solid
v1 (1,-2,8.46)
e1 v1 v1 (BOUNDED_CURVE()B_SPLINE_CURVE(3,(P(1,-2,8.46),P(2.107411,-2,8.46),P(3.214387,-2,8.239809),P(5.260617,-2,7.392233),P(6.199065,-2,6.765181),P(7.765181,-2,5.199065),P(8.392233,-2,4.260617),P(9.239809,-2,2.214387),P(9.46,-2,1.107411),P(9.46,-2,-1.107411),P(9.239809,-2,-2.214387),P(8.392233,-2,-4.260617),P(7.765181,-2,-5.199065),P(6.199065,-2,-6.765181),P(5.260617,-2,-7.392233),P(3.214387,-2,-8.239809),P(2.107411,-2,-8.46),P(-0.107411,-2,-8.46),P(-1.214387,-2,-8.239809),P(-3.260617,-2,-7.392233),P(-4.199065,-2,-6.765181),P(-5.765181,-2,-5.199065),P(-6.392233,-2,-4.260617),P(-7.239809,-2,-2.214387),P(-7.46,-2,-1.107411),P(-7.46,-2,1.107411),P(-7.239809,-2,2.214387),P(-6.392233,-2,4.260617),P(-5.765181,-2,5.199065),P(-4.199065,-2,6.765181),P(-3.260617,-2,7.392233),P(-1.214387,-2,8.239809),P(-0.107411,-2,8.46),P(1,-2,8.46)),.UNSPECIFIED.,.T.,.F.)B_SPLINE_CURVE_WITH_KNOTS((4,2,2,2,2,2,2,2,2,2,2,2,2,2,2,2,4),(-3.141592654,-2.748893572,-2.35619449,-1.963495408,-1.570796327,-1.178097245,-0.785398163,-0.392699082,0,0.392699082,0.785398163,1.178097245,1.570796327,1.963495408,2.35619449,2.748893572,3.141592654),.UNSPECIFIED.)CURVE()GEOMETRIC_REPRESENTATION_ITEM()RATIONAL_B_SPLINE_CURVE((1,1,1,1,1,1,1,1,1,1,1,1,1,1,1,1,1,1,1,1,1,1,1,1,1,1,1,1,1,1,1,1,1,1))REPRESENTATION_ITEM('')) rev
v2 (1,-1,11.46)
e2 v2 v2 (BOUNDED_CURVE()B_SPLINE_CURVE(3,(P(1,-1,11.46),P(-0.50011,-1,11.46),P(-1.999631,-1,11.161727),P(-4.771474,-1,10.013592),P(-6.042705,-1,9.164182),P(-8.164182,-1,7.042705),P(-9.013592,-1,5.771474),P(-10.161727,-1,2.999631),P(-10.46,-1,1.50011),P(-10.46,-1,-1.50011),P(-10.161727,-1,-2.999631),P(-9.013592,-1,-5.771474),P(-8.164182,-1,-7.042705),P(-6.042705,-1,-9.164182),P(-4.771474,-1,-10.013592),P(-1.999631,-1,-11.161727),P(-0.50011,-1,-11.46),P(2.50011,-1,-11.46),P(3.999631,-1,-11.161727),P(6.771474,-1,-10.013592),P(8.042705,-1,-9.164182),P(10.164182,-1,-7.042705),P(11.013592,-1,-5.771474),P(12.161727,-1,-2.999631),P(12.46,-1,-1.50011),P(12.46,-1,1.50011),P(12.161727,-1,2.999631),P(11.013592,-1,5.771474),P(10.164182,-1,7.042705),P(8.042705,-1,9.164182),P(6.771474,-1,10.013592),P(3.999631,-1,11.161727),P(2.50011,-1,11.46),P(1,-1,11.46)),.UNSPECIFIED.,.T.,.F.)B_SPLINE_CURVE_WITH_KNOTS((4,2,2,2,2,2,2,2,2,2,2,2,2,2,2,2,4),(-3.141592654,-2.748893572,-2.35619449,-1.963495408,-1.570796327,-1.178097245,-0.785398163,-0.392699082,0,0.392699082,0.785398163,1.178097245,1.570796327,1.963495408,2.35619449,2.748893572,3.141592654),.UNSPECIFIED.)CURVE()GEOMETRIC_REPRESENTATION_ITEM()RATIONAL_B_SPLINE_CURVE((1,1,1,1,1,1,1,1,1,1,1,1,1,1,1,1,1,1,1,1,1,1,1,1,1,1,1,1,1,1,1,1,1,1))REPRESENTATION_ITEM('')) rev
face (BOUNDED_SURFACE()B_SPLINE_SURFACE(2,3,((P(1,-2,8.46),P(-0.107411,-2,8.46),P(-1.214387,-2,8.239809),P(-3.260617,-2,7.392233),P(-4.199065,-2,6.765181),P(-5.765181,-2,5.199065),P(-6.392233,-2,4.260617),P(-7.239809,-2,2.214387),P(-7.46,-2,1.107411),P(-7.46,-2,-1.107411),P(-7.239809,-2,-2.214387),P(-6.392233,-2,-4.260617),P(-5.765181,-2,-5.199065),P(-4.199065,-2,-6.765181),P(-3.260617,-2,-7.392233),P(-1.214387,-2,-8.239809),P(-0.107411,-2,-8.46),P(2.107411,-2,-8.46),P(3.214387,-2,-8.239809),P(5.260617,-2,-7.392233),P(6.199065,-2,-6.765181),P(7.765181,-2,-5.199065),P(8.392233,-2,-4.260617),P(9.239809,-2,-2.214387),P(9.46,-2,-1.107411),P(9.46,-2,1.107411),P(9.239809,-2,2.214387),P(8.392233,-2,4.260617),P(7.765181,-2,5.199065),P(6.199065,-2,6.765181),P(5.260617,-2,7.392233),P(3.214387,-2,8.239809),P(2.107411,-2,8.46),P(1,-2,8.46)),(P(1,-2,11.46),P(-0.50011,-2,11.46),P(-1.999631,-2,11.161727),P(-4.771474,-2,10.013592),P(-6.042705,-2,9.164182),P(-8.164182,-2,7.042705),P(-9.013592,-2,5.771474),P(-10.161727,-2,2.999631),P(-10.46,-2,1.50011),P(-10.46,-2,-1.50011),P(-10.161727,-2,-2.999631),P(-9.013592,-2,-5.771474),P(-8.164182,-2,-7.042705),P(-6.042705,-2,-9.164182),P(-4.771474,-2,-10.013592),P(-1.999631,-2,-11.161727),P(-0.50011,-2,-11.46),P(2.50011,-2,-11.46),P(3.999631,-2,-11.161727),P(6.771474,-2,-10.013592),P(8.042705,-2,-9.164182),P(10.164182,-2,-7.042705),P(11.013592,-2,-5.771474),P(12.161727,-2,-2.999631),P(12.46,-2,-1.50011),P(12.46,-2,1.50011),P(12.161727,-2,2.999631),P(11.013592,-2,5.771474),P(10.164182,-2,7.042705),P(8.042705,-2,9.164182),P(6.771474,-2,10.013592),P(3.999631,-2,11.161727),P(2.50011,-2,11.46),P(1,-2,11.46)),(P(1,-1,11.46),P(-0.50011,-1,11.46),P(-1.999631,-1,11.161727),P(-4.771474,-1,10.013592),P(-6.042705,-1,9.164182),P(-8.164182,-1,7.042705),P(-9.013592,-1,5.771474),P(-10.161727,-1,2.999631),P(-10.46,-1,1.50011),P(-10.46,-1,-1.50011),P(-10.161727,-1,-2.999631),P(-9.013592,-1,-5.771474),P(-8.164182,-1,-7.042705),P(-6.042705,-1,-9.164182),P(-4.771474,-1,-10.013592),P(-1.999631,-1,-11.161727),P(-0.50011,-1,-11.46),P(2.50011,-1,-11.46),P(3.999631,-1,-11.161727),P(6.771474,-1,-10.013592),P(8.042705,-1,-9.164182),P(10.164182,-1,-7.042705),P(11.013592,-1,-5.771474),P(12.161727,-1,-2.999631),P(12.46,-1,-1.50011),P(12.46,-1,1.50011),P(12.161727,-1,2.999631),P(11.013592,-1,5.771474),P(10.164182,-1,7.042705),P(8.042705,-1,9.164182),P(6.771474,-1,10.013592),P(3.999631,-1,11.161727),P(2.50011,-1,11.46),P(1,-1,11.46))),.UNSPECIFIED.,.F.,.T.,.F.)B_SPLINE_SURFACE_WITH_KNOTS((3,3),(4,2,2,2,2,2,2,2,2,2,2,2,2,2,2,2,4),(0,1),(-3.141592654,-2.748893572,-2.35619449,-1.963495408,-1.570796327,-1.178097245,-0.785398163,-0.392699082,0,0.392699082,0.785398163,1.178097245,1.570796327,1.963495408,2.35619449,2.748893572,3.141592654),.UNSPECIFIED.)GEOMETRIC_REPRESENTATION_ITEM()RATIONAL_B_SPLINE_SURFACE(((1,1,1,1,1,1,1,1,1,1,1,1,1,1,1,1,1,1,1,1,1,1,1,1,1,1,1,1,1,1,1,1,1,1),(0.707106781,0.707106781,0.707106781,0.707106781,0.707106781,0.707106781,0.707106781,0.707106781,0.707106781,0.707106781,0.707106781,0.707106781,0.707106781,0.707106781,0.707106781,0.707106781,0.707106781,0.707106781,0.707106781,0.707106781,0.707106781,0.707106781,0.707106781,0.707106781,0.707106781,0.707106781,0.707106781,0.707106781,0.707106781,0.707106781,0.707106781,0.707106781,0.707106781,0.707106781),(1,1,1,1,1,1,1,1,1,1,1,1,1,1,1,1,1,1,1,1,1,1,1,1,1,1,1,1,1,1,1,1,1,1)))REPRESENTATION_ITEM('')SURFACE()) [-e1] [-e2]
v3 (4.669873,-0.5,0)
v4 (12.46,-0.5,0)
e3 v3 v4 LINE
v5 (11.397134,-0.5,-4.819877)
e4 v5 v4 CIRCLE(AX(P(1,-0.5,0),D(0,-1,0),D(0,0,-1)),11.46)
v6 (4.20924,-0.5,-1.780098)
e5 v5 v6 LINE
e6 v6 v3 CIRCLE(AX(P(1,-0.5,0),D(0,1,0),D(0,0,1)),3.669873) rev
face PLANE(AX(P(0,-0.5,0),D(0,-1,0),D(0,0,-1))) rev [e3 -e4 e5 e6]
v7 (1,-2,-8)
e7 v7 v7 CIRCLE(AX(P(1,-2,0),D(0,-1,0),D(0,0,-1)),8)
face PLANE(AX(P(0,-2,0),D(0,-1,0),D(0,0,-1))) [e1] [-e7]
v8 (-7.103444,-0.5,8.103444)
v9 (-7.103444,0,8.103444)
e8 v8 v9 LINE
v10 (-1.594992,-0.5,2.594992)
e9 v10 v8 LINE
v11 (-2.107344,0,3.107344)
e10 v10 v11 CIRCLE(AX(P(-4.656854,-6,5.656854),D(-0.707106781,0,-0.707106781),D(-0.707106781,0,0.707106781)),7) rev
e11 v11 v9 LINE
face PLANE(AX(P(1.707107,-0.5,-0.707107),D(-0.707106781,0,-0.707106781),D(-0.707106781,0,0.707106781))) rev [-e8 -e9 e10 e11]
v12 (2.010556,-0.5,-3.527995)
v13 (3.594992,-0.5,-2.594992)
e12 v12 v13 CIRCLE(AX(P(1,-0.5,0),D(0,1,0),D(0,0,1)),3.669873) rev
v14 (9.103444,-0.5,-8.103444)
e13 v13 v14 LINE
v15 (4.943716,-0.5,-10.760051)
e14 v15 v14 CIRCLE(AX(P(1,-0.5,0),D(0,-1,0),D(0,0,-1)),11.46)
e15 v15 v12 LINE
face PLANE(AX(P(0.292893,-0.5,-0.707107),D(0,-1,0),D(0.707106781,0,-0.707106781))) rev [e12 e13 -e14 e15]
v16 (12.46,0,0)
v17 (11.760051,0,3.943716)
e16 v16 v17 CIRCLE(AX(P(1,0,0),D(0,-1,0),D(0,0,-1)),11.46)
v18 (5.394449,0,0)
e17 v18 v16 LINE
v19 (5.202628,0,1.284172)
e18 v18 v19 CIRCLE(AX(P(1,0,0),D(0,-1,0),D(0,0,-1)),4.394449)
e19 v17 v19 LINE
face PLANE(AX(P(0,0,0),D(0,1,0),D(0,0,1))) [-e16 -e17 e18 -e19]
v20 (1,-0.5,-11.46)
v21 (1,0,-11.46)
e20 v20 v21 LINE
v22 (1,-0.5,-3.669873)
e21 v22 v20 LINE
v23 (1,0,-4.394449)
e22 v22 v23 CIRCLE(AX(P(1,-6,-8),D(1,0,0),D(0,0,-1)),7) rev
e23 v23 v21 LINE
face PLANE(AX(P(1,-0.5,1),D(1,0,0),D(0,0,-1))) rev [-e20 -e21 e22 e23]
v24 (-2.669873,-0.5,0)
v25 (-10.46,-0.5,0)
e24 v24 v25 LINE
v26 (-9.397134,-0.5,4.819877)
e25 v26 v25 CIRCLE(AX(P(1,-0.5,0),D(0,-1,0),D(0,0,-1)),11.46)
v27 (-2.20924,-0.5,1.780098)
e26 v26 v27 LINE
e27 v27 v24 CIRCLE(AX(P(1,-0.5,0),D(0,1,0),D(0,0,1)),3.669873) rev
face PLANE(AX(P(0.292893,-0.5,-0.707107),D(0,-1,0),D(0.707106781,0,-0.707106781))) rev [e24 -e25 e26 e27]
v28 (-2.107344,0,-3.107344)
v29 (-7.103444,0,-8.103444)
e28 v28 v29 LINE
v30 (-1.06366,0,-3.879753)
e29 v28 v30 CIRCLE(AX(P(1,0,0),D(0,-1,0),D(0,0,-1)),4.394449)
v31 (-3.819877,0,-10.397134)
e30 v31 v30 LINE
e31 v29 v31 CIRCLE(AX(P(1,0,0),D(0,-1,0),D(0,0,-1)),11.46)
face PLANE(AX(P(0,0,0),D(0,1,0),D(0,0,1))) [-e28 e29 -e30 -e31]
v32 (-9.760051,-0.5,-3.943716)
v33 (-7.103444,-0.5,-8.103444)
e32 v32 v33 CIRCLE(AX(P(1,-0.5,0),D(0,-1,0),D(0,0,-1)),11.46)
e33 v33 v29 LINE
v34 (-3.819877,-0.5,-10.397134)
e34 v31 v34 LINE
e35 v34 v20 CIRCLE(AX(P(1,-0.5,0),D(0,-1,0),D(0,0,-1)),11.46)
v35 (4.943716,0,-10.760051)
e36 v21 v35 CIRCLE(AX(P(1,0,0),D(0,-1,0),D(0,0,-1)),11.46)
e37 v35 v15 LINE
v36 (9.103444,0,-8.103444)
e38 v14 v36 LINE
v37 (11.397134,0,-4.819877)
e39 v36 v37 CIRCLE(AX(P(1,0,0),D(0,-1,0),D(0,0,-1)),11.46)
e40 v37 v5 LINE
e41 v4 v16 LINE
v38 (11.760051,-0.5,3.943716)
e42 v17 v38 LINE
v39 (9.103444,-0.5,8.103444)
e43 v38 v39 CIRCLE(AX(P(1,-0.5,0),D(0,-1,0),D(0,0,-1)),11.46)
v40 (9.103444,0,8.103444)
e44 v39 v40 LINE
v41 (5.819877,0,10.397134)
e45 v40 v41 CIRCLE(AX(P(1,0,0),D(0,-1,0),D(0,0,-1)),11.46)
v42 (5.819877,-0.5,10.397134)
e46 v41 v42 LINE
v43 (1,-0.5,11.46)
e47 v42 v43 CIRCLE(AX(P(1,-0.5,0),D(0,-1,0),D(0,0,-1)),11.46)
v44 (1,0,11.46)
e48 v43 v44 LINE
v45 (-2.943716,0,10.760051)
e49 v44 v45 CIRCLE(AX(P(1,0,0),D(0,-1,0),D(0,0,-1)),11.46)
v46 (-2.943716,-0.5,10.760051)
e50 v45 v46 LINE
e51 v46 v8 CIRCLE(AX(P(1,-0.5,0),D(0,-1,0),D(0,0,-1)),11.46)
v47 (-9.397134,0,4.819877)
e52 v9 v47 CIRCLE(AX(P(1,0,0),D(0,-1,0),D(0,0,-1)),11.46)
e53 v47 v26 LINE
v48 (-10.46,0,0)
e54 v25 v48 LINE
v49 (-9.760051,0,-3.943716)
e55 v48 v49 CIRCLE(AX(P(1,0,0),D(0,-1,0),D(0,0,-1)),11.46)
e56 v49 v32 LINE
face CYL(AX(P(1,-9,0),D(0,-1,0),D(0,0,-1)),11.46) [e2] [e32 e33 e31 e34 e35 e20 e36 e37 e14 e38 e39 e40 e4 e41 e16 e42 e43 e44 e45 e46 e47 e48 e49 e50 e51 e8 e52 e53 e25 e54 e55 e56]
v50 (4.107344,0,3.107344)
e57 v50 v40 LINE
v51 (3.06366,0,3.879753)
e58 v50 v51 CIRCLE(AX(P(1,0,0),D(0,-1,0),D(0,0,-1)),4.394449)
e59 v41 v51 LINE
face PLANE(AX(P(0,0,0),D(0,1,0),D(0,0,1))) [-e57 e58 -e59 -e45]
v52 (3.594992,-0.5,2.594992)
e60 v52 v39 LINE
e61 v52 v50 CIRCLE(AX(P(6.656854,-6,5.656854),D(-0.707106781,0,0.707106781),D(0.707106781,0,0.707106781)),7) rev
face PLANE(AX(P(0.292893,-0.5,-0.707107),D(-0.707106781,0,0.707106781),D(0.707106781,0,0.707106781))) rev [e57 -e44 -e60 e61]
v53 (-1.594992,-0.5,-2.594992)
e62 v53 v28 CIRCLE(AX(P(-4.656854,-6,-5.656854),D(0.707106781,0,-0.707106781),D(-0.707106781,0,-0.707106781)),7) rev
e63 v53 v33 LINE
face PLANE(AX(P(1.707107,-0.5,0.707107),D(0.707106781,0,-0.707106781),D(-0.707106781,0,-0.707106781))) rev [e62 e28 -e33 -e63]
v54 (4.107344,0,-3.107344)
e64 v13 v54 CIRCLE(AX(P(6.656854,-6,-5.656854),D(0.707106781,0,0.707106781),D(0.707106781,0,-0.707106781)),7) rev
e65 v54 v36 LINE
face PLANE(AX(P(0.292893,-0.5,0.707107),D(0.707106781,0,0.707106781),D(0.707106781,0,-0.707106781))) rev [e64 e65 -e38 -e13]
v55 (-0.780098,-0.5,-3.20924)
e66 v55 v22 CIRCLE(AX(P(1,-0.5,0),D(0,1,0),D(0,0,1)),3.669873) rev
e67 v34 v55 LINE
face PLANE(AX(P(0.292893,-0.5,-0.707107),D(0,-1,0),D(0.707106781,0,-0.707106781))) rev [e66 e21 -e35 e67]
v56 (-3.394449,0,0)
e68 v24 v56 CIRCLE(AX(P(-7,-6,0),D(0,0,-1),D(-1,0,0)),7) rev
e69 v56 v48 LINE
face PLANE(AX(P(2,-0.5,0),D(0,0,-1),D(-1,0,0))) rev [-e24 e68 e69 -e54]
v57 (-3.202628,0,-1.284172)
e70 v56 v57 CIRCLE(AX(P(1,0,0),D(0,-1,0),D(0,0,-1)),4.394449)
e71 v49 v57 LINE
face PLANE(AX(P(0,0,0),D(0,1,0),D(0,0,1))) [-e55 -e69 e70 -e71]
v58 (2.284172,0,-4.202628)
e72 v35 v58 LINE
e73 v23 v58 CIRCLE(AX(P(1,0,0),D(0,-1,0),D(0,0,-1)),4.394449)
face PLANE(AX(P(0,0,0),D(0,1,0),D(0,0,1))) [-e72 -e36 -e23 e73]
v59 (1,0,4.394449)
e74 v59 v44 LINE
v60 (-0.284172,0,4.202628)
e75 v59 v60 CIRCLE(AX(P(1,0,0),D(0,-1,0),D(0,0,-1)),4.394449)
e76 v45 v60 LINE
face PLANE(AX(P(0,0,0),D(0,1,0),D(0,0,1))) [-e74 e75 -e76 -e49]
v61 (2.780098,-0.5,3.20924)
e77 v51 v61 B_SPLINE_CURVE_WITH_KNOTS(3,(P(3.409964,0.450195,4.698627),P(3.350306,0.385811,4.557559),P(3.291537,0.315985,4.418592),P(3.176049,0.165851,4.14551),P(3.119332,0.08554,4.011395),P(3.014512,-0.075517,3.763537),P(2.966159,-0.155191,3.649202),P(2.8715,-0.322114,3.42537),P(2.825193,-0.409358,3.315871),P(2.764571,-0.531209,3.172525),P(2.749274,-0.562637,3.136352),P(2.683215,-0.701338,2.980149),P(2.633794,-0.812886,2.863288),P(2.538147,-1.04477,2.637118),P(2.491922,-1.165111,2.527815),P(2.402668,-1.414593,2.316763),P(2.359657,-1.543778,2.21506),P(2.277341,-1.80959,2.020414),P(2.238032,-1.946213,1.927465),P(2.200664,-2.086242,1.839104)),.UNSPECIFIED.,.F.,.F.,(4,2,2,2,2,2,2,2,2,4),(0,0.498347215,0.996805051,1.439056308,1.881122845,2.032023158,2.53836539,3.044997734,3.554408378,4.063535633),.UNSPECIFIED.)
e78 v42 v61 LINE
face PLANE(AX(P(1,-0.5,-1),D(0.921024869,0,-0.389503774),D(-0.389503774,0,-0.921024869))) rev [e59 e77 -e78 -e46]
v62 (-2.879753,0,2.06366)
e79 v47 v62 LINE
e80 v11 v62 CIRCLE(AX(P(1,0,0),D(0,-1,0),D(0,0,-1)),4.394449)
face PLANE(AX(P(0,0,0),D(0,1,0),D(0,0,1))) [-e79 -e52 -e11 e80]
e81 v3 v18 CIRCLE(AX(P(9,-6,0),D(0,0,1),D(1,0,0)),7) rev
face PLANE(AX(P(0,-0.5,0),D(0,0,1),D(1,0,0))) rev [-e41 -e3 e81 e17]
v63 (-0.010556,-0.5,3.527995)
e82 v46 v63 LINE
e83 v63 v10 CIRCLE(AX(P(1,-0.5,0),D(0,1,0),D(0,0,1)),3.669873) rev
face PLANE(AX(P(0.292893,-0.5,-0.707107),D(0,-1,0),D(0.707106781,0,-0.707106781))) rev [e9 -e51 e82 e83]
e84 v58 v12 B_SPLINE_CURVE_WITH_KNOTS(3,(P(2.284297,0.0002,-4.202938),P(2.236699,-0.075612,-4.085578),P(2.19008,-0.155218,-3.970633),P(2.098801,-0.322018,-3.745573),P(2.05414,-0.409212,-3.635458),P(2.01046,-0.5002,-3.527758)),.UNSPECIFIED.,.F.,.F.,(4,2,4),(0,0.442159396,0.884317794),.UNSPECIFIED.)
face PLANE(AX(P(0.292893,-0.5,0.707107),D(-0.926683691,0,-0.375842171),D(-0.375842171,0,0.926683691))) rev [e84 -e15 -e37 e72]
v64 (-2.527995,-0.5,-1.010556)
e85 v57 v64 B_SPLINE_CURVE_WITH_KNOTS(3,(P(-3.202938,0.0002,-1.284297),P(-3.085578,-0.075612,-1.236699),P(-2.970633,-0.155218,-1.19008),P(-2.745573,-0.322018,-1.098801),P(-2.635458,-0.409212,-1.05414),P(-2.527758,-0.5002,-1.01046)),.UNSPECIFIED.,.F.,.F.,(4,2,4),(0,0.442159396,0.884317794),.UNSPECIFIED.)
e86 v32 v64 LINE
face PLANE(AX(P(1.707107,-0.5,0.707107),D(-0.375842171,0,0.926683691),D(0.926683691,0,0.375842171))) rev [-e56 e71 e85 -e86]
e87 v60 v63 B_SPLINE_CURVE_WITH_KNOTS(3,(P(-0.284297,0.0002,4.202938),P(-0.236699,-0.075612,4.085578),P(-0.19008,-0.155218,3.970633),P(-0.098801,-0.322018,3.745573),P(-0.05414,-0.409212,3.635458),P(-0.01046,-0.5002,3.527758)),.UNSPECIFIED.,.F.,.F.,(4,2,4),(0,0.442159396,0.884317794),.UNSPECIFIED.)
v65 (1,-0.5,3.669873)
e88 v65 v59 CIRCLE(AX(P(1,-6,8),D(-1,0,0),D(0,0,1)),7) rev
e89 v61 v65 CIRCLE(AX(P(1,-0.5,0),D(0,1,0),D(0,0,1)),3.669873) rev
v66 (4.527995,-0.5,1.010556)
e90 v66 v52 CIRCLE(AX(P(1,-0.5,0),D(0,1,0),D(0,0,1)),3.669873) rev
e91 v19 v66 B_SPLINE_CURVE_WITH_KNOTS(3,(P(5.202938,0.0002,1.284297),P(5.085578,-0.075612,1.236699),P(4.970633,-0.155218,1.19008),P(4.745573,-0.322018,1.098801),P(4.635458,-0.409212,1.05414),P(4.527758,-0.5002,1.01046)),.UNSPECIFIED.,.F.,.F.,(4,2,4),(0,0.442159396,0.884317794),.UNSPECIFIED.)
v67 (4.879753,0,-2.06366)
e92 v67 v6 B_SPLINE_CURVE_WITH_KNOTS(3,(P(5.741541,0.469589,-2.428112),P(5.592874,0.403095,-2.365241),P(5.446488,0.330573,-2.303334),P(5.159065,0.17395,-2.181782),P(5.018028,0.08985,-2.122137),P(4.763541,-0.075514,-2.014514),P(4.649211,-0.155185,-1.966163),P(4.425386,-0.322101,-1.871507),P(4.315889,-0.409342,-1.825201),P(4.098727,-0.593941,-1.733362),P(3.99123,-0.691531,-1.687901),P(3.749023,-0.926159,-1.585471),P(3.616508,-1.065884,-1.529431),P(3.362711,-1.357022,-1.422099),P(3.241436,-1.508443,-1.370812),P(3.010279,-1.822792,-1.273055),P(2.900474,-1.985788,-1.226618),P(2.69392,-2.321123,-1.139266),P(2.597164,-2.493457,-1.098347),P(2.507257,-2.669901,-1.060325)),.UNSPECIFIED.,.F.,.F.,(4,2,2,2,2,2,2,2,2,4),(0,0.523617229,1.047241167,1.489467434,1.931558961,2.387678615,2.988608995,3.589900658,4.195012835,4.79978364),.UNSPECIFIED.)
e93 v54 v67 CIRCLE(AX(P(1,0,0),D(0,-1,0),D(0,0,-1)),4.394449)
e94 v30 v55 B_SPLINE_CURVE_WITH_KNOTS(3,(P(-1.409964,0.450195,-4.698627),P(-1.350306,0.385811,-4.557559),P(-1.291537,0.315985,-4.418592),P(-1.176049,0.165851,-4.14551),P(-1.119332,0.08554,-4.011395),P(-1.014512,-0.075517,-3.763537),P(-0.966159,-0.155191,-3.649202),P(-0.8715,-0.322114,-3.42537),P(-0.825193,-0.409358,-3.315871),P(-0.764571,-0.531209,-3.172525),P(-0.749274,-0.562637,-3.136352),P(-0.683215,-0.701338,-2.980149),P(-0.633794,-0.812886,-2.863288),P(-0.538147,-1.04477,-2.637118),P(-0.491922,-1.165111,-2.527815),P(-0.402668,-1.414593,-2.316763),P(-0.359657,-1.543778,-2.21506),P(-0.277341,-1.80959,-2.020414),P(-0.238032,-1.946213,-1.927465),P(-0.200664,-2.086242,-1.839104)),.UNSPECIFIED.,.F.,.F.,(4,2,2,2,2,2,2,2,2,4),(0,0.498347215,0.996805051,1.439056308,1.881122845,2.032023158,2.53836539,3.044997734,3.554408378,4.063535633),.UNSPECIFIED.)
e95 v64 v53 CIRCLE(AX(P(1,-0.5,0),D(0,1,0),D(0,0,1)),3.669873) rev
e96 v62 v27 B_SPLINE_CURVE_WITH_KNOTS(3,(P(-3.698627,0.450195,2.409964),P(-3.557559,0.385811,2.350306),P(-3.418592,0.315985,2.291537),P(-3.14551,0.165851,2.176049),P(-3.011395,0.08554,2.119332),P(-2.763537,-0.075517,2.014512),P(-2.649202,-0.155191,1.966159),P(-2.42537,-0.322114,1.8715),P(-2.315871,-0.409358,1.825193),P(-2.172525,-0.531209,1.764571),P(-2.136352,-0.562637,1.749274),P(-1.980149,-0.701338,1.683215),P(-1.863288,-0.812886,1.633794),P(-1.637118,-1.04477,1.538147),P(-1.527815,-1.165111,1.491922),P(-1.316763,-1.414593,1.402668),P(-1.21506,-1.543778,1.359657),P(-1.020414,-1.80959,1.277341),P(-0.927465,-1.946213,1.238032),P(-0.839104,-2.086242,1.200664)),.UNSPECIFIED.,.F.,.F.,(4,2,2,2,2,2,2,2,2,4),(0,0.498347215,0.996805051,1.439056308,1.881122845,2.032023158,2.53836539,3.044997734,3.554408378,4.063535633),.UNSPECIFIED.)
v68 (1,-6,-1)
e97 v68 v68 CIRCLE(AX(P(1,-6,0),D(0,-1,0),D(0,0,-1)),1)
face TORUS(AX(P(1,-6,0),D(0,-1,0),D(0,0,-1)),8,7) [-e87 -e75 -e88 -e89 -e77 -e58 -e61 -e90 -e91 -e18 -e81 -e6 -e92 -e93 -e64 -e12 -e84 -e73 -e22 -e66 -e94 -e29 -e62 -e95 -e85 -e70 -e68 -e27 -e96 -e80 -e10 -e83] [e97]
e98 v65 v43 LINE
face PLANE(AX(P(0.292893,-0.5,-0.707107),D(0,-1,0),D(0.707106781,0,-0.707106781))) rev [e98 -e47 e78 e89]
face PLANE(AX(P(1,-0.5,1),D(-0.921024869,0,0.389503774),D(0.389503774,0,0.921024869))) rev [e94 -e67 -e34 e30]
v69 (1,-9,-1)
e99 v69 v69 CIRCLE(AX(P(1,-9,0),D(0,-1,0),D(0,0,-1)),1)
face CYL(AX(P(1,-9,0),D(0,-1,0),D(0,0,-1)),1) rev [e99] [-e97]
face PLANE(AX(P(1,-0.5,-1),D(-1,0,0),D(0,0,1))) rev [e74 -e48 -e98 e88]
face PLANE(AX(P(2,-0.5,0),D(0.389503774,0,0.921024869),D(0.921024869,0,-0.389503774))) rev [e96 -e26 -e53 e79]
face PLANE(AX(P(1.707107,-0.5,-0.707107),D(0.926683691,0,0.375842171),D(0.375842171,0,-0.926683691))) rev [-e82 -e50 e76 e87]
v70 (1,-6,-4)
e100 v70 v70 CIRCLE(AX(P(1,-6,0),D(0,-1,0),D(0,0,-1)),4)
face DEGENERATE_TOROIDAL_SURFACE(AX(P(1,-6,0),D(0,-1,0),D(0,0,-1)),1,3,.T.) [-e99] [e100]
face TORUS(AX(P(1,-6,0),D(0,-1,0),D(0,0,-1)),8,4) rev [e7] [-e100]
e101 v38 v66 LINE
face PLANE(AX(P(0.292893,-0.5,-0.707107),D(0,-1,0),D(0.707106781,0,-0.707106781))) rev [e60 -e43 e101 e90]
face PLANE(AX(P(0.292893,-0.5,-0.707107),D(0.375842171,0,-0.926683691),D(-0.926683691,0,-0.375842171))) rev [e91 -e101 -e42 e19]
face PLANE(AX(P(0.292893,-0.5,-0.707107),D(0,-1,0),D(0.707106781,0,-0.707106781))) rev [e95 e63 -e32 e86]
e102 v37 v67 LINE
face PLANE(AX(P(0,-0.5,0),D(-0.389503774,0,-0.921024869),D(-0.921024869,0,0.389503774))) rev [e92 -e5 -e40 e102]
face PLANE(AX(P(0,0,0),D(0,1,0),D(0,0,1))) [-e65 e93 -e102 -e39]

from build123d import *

# Parameters (mm, degrees)
FILLET3_SIZE       = 1
FILLET3_SIZE_2     = 3
CUT_EXTRUDE5_DEPTH = 0.5
CIRPATTERN3_COUNT  = 8


with BuildPart() as part:
    # Sketch2 → Revolve4 (revolve)
    with BuildSketch(Plane.XY, mode=Mode.PRIVATE) as revolve4_sk:
        with BuildLine():
            Line((-10.46, 0), (-10.46, -2))
            Line((-10.46, -2), (-7, -2))
            ThreePointArc((-7, -2), (-4.171572875, -3.171572875), (-3, -6))
            ThreePointArc((-3, -6), (-2.121320344, -8.121320344), (0, -9))
            Line((0, -9), (0, -6))
            ThreePointArc((0, -6), (-0.907428337, -2.553179648), (-3.394448725, 0))
            Line((-3.394448725, 0), (-10.46, 0))
        make_face()
    revolve(revolve4_sk.sketch.rotate(Axis((1, -9, 0), (0, 1, 0)), 270), axis=Axis((1, -9, 0), (0, 1, 0)))

    # Fillet3
    # an asymmetric fillet: 3, 1 mm, written as the material it takes off along each edge
    with BuildSketch(Plane(origin=(1, -2, 0), x_dir=(0, 0, -1), z_dir=(1, 0, 0))) as fillet3_piece_1:
        with BuildLine():
            Bezier((11.46, FILLET3_SIZE), (11.46, 0), (11.46 - FILLET3_SIZE_2, 0), weights=[1, 0.707106781, 1])
            Line((11.46 - FILLET3_SIZE_2, 0), (11.46, 0))
            Line((11.46, 0), (11.46, FILLET3_SIZE))
        make_face()
    revolve(axis=Axis((1, -2, 0), (0, 1, 0)), mode=Mode.SUBTRACT)

    # Sketch8 → Cut-Extrude5 (cut)
    with BuildSketch(Plane(origin=(0, 0, 0), x_dir=(1, 0, 0), z_dir=(0, 1, 0))):
        Polygon((0, 0), (18.255808177, 0), (16.586053461, 7.014284446), align=None)
    cut_extrude5 = extrude(amount=-CUT_EXTRUDE5_DEPTH, mode=Mode.SUBTRACT)

    # CirPattern3: Cut-Extrude5 ×8 about axis
    cirpattern3_axis = Axis((1, 0, 0), (0, 1, 0))
    for i in range(1, CIRPATTERN3_COUNT):
        add(cut_extrude5.rotate(cirpattern3_axis, i * 360 / CIRPATTERN3_COUNT), mode=Mode.SUBTRACT)


solid = part.part
